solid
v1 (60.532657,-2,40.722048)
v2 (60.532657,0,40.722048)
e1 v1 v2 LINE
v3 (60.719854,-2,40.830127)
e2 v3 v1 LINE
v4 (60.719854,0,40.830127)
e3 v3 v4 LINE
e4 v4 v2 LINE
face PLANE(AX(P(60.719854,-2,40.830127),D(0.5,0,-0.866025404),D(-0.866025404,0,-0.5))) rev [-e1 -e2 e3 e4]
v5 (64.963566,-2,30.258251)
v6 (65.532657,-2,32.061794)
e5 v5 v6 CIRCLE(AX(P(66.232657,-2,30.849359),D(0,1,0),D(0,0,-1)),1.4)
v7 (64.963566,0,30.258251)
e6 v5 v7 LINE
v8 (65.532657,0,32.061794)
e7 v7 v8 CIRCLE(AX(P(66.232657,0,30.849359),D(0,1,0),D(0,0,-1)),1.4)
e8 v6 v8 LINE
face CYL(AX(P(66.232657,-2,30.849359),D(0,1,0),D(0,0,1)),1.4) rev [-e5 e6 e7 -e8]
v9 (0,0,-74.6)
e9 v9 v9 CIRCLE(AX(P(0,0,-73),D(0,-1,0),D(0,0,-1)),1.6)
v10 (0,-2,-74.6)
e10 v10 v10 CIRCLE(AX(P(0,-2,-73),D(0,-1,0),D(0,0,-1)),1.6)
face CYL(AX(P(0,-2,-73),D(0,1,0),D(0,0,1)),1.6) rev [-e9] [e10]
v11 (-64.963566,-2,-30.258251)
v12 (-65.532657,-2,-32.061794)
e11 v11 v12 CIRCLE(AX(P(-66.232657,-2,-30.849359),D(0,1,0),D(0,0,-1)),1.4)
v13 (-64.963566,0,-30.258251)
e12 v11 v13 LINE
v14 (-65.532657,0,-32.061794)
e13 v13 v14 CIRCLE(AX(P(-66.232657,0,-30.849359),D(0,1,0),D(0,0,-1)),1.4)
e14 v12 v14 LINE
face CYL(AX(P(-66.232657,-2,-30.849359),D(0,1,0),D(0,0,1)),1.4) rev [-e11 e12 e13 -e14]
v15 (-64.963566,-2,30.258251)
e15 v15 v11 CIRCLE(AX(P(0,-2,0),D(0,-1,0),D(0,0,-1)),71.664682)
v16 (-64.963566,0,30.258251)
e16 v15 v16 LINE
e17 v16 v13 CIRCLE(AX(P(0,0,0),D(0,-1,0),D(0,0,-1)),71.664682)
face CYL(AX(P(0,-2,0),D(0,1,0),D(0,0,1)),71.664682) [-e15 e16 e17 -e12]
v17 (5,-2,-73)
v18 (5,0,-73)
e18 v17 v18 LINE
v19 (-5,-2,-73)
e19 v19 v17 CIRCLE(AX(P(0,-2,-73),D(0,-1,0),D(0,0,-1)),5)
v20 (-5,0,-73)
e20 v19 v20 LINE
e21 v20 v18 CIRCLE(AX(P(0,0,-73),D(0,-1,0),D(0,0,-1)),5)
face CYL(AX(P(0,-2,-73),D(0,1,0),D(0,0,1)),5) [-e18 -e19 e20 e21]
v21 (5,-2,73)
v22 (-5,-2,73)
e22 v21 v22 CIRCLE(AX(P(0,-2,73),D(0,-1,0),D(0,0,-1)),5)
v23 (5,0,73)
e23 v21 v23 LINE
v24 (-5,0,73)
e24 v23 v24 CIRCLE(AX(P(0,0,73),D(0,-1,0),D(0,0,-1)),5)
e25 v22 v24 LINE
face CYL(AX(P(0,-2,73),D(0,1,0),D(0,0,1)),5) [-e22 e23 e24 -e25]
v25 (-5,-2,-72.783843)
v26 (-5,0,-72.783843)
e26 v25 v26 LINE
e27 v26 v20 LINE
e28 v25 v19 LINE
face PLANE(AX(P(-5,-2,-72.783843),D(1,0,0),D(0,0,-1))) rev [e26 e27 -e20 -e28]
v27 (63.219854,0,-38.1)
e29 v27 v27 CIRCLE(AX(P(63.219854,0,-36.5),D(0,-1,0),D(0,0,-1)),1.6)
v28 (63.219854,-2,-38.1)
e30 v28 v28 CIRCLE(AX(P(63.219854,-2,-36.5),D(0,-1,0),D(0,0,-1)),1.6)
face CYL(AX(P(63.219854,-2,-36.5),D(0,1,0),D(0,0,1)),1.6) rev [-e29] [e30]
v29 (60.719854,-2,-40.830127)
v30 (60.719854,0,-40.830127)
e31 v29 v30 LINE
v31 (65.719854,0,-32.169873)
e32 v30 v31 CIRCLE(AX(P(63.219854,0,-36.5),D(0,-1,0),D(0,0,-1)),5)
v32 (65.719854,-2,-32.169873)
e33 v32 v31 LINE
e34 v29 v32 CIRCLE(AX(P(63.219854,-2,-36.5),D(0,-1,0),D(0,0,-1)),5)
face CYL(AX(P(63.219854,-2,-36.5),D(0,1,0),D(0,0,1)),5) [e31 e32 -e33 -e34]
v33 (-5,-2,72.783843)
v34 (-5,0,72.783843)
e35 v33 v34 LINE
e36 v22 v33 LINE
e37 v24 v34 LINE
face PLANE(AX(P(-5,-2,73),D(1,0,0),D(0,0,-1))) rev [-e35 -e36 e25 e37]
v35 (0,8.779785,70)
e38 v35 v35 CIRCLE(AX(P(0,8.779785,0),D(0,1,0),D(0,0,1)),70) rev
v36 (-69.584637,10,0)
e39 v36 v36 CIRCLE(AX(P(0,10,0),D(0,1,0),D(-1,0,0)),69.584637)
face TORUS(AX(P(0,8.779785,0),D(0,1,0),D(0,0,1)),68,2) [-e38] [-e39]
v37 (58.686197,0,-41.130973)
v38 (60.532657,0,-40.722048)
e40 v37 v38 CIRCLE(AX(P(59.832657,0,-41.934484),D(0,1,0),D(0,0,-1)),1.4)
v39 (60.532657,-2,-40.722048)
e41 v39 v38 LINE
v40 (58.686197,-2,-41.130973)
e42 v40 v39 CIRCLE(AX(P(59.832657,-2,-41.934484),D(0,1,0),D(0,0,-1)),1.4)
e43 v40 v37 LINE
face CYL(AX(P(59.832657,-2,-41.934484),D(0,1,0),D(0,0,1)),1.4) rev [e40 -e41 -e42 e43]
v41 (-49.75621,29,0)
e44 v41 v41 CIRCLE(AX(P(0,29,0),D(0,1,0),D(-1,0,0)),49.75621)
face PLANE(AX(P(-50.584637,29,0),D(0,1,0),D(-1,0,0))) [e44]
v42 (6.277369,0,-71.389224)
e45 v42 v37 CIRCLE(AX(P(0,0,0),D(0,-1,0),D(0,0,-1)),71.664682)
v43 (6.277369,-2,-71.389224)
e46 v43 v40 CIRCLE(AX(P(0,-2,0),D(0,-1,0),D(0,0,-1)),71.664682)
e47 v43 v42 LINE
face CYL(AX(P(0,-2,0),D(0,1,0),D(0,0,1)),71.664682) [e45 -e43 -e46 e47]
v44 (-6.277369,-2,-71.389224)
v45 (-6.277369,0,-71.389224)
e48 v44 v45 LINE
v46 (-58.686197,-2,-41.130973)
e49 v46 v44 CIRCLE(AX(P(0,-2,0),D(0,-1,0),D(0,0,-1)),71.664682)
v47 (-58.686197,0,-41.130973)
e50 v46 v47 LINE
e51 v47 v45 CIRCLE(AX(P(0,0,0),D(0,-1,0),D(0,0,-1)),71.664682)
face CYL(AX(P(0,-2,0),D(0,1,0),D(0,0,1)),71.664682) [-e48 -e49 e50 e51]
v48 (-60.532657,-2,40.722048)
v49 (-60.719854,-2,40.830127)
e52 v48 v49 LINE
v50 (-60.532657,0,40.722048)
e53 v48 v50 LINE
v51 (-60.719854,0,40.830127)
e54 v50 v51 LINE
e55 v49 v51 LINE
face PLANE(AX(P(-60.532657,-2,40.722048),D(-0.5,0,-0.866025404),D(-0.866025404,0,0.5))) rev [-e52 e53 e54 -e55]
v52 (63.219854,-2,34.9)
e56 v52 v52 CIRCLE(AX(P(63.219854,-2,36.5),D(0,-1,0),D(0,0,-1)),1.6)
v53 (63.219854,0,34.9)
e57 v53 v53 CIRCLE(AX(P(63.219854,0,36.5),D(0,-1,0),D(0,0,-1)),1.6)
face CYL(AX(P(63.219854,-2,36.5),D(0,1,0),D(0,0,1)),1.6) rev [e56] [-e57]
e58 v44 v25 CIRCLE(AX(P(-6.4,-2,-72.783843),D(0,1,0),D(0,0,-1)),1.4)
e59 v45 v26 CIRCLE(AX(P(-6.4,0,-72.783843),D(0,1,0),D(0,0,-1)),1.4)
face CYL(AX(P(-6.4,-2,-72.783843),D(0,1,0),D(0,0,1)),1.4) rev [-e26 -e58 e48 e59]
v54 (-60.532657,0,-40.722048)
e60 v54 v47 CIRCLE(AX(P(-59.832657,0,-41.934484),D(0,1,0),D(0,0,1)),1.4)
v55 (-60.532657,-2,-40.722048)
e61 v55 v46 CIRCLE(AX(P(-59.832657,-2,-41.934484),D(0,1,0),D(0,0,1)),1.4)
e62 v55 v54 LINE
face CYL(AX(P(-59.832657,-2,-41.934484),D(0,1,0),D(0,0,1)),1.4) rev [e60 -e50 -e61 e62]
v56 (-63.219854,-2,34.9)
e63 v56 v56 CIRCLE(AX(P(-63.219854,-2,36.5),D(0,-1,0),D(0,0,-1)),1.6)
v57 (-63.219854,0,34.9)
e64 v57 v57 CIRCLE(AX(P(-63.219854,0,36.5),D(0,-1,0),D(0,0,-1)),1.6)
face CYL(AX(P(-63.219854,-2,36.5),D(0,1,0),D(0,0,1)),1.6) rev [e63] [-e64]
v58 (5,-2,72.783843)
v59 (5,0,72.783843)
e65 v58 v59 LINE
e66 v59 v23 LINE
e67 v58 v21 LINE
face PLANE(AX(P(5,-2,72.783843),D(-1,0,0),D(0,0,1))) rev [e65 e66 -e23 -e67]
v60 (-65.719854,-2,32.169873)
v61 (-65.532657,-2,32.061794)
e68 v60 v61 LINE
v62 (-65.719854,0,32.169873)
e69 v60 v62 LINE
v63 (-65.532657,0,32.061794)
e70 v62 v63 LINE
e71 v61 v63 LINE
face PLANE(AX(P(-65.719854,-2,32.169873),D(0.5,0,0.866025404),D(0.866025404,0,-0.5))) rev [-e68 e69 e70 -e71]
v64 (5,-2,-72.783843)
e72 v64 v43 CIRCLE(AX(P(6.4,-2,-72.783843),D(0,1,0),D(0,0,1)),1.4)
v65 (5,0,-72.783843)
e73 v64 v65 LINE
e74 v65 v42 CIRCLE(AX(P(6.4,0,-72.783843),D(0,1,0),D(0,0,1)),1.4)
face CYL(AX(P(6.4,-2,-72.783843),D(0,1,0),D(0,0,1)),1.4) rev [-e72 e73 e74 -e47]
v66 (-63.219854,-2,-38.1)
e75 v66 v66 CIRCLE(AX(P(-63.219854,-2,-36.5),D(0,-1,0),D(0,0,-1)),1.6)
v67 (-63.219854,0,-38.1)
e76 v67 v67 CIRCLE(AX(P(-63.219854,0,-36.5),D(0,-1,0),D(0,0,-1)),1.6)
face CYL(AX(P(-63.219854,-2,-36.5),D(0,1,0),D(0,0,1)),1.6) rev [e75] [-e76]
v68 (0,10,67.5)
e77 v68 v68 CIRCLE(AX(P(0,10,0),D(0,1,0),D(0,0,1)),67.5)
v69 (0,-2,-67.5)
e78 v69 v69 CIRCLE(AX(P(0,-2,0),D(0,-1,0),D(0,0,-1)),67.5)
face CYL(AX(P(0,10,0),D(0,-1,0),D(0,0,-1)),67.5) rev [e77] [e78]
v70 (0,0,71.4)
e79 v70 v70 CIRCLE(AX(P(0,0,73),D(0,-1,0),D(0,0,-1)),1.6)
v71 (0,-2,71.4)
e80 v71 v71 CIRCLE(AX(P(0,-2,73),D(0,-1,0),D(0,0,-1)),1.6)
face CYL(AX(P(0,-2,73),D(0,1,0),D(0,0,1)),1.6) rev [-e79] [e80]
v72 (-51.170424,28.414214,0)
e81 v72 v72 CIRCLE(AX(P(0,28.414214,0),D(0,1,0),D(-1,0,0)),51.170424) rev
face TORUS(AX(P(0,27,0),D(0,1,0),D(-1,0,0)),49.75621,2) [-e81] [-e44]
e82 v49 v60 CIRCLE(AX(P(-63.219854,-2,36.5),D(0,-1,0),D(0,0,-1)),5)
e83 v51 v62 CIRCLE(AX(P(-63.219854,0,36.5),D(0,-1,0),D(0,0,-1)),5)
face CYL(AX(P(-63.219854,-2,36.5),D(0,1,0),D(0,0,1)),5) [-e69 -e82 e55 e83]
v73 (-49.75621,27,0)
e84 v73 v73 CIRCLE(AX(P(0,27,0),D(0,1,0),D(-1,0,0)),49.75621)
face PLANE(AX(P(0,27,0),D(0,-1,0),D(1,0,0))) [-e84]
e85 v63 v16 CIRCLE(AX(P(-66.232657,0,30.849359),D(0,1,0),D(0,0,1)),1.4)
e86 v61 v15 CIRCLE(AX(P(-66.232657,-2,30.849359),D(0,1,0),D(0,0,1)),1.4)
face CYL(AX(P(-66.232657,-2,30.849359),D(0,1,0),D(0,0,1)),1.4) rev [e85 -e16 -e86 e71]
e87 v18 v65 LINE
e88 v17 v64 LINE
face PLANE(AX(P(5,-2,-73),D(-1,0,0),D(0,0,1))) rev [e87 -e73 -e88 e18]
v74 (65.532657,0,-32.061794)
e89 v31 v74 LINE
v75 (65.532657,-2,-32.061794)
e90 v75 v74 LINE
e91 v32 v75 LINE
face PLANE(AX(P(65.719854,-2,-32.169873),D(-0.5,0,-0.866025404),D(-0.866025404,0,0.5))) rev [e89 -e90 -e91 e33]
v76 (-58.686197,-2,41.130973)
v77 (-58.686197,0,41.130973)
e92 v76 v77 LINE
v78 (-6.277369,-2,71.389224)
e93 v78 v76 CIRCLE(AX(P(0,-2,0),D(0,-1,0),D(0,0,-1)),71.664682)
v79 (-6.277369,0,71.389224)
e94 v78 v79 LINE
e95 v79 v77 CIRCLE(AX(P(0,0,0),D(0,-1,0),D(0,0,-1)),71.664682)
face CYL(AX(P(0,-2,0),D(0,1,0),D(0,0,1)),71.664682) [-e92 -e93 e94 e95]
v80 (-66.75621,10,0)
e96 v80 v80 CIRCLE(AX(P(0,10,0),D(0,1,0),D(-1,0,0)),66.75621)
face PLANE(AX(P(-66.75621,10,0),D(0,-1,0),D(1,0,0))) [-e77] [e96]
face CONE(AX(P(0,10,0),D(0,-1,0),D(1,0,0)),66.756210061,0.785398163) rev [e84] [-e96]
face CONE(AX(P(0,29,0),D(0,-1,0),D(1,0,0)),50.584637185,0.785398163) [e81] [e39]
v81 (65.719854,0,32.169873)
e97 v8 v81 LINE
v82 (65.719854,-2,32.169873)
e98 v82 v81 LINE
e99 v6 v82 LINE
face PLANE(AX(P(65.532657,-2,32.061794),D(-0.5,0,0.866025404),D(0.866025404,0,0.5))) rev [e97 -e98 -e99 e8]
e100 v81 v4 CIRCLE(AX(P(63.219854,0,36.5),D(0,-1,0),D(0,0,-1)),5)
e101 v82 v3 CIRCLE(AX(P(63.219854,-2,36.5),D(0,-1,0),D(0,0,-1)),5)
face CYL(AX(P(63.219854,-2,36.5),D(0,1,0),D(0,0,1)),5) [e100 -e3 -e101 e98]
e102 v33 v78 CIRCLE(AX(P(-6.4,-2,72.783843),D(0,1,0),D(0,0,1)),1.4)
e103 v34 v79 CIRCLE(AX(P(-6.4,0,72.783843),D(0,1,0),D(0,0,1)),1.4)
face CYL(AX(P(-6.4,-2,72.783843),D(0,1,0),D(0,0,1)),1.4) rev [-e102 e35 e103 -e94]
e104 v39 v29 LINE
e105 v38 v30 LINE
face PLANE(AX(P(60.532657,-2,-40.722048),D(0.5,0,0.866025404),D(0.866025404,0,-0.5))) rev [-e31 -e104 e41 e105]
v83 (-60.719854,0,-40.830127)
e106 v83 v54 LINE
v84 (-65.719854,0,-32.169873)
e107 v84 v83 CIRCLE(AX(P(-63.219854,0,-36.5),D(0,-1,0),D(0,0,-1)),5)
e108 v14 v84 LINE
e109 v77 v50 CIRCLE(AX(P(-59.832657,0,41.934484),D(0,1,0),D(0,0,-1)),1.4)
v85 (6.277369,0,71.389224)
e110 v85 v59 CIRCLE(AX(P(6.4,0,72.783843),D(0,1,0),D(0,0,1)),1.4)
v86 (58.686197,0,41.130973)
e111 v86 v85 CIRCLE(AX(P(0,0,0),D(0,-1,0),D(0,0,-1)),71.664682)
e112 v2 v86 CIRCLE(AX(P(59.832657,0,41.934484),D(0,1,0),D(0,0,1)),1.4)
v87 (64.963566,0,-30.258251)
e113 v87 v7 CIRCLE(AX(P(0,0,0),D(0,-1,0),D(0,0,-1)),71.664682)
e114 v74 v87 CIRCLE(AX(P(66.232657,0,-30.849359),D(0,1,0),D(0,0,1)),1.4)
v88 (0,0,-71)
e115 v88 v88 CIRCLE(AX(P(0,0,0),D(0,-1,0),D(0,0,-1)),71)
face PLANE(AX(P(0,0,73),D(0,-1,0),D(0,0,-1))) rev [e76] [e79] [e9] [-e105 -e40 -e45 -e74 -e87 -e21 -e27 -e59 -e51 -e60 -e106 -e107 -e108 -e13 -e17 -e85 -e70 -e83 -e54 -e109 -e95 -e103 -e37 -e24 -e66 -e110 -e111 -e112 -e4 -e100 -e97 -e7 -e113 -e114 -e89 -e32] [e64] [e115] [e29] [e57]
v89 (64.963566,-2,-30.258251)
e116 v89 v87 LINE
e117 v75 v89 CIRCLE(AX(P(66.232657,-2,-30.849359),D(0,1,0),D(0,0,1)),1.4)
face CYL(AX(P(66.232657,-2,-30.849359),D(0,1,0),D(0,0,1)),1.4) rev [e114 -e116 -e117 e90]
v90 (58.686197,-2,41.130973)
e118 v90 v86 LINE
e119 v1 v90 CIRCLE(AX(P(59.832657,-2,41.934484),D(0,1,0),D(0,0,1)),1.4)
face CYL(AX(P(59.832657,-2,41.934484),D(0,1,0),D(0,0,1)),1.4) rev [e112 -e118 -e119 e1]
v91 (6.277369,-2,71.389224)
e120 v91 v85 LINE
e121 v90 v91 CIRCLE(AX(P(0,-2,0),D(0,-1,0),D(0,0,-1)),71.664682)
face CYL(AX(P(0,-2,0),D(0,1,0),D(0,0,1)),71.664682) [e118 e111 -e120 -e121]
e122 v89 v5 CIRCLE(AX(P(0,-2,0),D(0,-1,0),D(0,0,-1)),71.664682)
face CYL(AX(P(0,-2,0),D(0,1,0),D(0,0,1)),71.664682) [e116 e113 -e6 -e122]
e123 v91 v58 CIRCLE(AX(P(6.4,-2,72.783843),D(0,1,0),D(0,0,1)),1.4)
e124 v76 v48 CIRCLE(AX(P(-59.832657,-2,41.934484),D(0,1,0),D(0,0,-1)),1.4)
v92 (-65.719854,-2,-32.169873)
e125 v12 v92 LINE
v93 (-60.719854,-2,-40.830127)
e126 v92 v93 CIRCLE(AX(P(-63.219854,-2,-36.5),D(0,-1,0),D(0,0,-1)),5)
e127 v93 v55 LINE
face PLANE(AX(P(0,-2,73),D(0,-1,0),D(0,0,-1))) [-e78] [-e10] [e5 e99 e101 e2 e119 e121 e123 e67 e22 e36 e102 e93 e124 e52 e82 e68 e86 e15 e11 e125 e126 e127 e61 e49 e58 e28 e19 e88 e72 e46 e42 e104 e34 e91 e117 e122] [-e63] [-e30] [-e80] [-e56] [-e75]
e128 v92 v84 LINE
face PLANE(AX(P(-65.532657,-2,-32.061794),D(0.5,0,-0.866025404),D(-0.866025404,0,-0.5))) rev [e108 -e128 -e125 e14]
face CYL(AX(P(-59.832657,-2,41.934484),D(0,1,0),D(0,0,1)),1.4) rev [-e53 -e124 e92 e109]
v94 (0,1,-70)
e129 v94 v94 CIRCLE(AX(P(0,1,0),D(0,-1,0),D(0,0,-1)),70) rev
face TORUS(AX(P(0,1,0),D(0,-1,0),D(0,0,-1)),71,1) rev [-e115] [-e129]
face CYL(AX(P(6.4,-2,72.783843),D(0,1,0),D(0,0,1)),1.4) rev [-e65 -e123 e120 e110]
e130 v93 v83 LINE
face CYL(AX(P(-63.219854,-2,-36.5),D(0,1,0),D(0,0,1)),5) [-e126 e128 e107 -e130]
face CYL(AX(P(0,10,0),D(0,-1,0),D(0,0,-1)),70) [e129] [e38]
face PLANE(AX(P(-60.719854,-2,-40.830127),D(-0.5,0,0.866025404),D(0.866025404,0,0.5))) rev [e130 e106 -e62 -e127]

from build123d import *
from build123d.topology import SkipClean

# Parameters (mm, degrees)
SKETCH_1_R      = 70
SKETCH_1_R_2    = 67.5
EXTRUDE_1_DEPTH = 10
EXTRUDE_START   = 2
SKETCH_2_R      = 67.5
SKETCH_2_R_2    = 1.6
EXTRUDE_2_DEPTH = 2
FILLET_1_R      = 1
FILLET_2_R      = 2


with BuildPart() as part:
    # Эскиз1 → Бобышка-Вытянуть1 (new body)
    with BuildSketch(Plane(origin=(0, 0, 0), x_dir=(1, 0, 0), z_dir=(0, 1, 0))):
        with Locations(Location((0, 0, 0), (0, 0, 270))):
            Circle(SKETCH_1_R)
        with Locations(Location((0, 0, 0), (0, 0, 270))):
            Circle(SKETCH_1_R_2, mode=Mode.SUBTRACT)
    extrude(amount=EXTRUDE_1_DEPTH)

    # Эскиз2 → Бобышка-Вытянуть2 (add)
    with SkipClean():  # the faces are left unmerged after this step: merging them gives an invalid solid
        with BuildSketch(Plane.XZ.offset(EXTRUDE_START)):
            with BuildLine():
                Line((-5, 73), (-5, 72.783842909))
                ThreePointArc((-5, 72.783842909), (-5.367603881, 71.838243495), (-6.277368932, 71.389224101))
                ThreePointArc((-6.277368932, 71.389224101), (-35.832341113, 62.063435361), (-58.686197162, 41.130973015))
                ThreePointArc((-58.686197162, 41.130973015), (-59.52994189, 40.567603065), (-60.532656944, 40.722048474))
                Line((-60.532656944, 40.722048474), (-60.719854476, 40.830127019))
                ThreePointArc((-60.719854476, 40.830127019), (-67.549981495, 39), (-65.719854476, 32.169872981))
                Line((-65.719854476, 32.169872981), (-65.532656944, 32.061794436))
                ThreePointArc((-65.532656944, 32.061794436), (-64.89754577, 31.270640429), (-64.963566094, 30.258251086))
                ThreePointArc((-64.963566094, 30.258251086), (-71.664682225, 0), (-64.963566094, -30.258251086))
                ThreePointArc((-64.963566094, -30.258251086), (-64.89754577, -31.270640429), (-65.532656944, -32.061794436))
                Line((-65.532656944, -32.061794436), (-65.719854476, -32.169872981))
                ThreePointArc((-65.719854476, -32.169872981), (-67.549981495, -39), (-60.719854476, -40.830127019))
                Line((-60.719854476, -40.830127019), (-60.532656944, -40.722048474))
                ThreePointArc((-60.532656944, -40.722048474), (-59.52994189, -40.567603065), (-58.686197162, -41.130973015))
                ThreePointArc((-58.686197162, -41.130973015), (-35.832341113, -62.063435361), (-6.277368932, -71.389224101))
                ThreePointArc((-6.277368932, -71.389224101), (-5.367603881, -71.838243495), (-5, -72.783842909))
                Line((-5, -72.783842909), (-5, -73))
                ThreePointArc((-5, -73), (0, -78), (5, -73))
                Line((5, -73), (5, -72.783842909))
                ThreePointArc((5, -72.783842909), (5.367603881, -71.838243495), (6.277368932, -71.389224101))
                ThreePointArc((6.277368932, -71.389224101), (35.832341113, -62.063435361), (58.686197162, -41.130973015))
                ThreePointArc((58.686197162, -41.130973015), (59.52994189, -40.567603065), (60.532656944, -40.722048474))
                Line((60.532656944, -40.722048474), (60.719854476, -40.830127019))
                ThreePointArc((60.719854476, -40.830127019), (67.549981495, -39), (65.719854476, -32.169872981))
                Line((65.719854476, -32.169872981), (65.532656944, -32.061794436))
                ThreePointArc((65.532656944, -32.061794436), (64.89754577, -31.270640429), (64.963566094, -30.258251086))
                ThreePointArc((64.963566094, -30.258251086), (71.664682225, 0), (64.963566094, 30.258251086))
                ThreePointArc((64.963566094, 30.258251086), (64.89754577, 31.270640429), (65.532656944, 32.061794436))
                Line((65.532656944, 32.061794436), (65.719854476, 32.169872981))
                ThreePointArc((65.719854476, 32.169872981), (67.549981495, 39), (60.719854476, 40.830127019))
                Line((60.719854476, 40.830127019), (60.532656944, 40.722048474))
                ThreePointArc((60.532656944, 40.722048474), (59.52994189, 40.567603065), (58.686197162, 41.130973015))
                ThreePointArc((58.686197162, 41.130973015), (35.832341113, 62.063435361), (6.277368932, 71.389224101))
                ThreePointArc((6.277368932, 71.389224101), (5.367603881, 71.838243495), (5, 72.783842909))
                Line((5, 72.783842909), (5, 73))
                ThreePointArc((5, 73), (0, 78), (-5, 73))
            make_face()
            with Locations(Location((0, 0, 0), (0, 0, 270))):
                Circle(SKETCH_2_R, mode=Mode.SUBTRACT)
            with Locations(Location((0, 73, 0), (0, 0, 270))):
                Circle(SKETCH_2_R_2, mode=Mode.SUBTRACT)
            with Locations(Location((63.219854476, 36.5, 0), (0, 0, 270))):
                Circle(SKETCH_2_R_2, mode=Mode.SUBTRACT)
            with Locations(Location((63.219854476, -36.5, 0), (0, 0, 270))):
                Circle(SKETCH_2_R_2, mode=Mode.SUBTRACT)
            with Locations(Location((0, -73, 0), (0, 0, 270))):
                Circle(SKETCH_2_R_2, mode=Mode.SUBTRACT)
            with Locations(Location((-63.219854476, -36.5, 0), (0, 0, 270))):
                Circle(SKETCH_2_R_2, mode=Mode.SUBTRACT)
            with Locations(Location((-63.219854476, 36.5, 0), (0, 0, 270))):
                Circle(SKETCH_2_R_2, mode=Mode.SUBTRACT)
        extrude(amount=-EXTRUDE_2_DEPTH)

    # Скругление1
    fillet_1_edges = [part.edges().sort_by_distance(p)[0] for p in [
        (0, 0, -70),
    ]]
    fillet(fillet_1_edges, radius=FILLET_1_R)

    # Эскиз3 → Повернуть1 (revolve)
    with BuildSketch(Plane.XY, mode=Mode.PRIVATE) as revolve_1_sk:
        Polygon((-69.584637185, 10), (-50.584637185, 29), (0, 29), (0, 27), (-49.756210061, 27), (-66.756210061, 10), align=None)
    revolve(revolve_1_sk.sketch.rotate(Axis((0, 27, 0), (0, -1, 0)), 90), axis=Axis((0, 27, 0), (0, -1, 0)))

    # Скругление2
    # the kernel refuses this fillet: 2 mm, written as the material it takes off along each edge
    with BuildSketch(Plane(origin=(0, 29, 0), x_dir=(0, 0, -1), z_dir=(-1, 0, 0))) as fillet_2_piece_1:
        with BuildLine():
            CenterArc((50.584637185 - FILLET_2_R * 0.414213562373, FILLET_2_R), FILLET_2_R, 270, 45)
            Line((50.584637185 - FILLET_2_R * 0.414213562373, 0), (50.584637185 - FILLET_2_R * 0.414213562373, -FILLET_2_R * 0.02))
            Line((50.584637185 - FILLET_2_R * 0.414213562373, -FILLET_2_R * 0.02), (50.584637185 + FILLET_2_R * 0.00828427124746, -FILLET_2_R * 0.02))
            Line((50.584637185 + FILLET_2_R * 0.00828427124746, -FILLET_2_R * 0.02), (50.584637185 + FILLET_2_R * 0.307035354437, FILLET_2_R * 0.27875108319))
            Line((50.584637185 + FILLET_2_R * 0.307035354437, FILLET_2_R * 0.27875108319), (50.584637185 + FILLET_2_R * 0.292893218813, FILLET_2_R * 0.292893218813))
        make_face()
    revolve(axis=Axis((0, 29, 0), (0, -1, 0)), mode=Mode.SUBTRACT)
    with BuildSketch(Plane(origin=(0, 10, 0), x_dir=(0, 0, 1), z_dir=(-1, 0, 0))) as fillet_2_piece_2:
        with BuildLine():
            CenterArc((68, -1.220215141), FILLET_2_R, 0, 37.597281425)
            Line((69.584637185, 0), (69.616329929, 0.024404303))
            ThreePointArc((69.616329929, 0.024404303), (69.792318593, 0.04), (70, 0.04))
            Line((70, 0.04), (70.04, 0))
            Line((70.04, 0), (70.04, -1.220215141))
            Line((70.04, -1.220215141), (70, -1.220215141))
        make_face()
    revolve(axis=Axis((0, 10, 0), (0, 1, 0)), mode=Mode.SUBTRACT)


solid = part.part
